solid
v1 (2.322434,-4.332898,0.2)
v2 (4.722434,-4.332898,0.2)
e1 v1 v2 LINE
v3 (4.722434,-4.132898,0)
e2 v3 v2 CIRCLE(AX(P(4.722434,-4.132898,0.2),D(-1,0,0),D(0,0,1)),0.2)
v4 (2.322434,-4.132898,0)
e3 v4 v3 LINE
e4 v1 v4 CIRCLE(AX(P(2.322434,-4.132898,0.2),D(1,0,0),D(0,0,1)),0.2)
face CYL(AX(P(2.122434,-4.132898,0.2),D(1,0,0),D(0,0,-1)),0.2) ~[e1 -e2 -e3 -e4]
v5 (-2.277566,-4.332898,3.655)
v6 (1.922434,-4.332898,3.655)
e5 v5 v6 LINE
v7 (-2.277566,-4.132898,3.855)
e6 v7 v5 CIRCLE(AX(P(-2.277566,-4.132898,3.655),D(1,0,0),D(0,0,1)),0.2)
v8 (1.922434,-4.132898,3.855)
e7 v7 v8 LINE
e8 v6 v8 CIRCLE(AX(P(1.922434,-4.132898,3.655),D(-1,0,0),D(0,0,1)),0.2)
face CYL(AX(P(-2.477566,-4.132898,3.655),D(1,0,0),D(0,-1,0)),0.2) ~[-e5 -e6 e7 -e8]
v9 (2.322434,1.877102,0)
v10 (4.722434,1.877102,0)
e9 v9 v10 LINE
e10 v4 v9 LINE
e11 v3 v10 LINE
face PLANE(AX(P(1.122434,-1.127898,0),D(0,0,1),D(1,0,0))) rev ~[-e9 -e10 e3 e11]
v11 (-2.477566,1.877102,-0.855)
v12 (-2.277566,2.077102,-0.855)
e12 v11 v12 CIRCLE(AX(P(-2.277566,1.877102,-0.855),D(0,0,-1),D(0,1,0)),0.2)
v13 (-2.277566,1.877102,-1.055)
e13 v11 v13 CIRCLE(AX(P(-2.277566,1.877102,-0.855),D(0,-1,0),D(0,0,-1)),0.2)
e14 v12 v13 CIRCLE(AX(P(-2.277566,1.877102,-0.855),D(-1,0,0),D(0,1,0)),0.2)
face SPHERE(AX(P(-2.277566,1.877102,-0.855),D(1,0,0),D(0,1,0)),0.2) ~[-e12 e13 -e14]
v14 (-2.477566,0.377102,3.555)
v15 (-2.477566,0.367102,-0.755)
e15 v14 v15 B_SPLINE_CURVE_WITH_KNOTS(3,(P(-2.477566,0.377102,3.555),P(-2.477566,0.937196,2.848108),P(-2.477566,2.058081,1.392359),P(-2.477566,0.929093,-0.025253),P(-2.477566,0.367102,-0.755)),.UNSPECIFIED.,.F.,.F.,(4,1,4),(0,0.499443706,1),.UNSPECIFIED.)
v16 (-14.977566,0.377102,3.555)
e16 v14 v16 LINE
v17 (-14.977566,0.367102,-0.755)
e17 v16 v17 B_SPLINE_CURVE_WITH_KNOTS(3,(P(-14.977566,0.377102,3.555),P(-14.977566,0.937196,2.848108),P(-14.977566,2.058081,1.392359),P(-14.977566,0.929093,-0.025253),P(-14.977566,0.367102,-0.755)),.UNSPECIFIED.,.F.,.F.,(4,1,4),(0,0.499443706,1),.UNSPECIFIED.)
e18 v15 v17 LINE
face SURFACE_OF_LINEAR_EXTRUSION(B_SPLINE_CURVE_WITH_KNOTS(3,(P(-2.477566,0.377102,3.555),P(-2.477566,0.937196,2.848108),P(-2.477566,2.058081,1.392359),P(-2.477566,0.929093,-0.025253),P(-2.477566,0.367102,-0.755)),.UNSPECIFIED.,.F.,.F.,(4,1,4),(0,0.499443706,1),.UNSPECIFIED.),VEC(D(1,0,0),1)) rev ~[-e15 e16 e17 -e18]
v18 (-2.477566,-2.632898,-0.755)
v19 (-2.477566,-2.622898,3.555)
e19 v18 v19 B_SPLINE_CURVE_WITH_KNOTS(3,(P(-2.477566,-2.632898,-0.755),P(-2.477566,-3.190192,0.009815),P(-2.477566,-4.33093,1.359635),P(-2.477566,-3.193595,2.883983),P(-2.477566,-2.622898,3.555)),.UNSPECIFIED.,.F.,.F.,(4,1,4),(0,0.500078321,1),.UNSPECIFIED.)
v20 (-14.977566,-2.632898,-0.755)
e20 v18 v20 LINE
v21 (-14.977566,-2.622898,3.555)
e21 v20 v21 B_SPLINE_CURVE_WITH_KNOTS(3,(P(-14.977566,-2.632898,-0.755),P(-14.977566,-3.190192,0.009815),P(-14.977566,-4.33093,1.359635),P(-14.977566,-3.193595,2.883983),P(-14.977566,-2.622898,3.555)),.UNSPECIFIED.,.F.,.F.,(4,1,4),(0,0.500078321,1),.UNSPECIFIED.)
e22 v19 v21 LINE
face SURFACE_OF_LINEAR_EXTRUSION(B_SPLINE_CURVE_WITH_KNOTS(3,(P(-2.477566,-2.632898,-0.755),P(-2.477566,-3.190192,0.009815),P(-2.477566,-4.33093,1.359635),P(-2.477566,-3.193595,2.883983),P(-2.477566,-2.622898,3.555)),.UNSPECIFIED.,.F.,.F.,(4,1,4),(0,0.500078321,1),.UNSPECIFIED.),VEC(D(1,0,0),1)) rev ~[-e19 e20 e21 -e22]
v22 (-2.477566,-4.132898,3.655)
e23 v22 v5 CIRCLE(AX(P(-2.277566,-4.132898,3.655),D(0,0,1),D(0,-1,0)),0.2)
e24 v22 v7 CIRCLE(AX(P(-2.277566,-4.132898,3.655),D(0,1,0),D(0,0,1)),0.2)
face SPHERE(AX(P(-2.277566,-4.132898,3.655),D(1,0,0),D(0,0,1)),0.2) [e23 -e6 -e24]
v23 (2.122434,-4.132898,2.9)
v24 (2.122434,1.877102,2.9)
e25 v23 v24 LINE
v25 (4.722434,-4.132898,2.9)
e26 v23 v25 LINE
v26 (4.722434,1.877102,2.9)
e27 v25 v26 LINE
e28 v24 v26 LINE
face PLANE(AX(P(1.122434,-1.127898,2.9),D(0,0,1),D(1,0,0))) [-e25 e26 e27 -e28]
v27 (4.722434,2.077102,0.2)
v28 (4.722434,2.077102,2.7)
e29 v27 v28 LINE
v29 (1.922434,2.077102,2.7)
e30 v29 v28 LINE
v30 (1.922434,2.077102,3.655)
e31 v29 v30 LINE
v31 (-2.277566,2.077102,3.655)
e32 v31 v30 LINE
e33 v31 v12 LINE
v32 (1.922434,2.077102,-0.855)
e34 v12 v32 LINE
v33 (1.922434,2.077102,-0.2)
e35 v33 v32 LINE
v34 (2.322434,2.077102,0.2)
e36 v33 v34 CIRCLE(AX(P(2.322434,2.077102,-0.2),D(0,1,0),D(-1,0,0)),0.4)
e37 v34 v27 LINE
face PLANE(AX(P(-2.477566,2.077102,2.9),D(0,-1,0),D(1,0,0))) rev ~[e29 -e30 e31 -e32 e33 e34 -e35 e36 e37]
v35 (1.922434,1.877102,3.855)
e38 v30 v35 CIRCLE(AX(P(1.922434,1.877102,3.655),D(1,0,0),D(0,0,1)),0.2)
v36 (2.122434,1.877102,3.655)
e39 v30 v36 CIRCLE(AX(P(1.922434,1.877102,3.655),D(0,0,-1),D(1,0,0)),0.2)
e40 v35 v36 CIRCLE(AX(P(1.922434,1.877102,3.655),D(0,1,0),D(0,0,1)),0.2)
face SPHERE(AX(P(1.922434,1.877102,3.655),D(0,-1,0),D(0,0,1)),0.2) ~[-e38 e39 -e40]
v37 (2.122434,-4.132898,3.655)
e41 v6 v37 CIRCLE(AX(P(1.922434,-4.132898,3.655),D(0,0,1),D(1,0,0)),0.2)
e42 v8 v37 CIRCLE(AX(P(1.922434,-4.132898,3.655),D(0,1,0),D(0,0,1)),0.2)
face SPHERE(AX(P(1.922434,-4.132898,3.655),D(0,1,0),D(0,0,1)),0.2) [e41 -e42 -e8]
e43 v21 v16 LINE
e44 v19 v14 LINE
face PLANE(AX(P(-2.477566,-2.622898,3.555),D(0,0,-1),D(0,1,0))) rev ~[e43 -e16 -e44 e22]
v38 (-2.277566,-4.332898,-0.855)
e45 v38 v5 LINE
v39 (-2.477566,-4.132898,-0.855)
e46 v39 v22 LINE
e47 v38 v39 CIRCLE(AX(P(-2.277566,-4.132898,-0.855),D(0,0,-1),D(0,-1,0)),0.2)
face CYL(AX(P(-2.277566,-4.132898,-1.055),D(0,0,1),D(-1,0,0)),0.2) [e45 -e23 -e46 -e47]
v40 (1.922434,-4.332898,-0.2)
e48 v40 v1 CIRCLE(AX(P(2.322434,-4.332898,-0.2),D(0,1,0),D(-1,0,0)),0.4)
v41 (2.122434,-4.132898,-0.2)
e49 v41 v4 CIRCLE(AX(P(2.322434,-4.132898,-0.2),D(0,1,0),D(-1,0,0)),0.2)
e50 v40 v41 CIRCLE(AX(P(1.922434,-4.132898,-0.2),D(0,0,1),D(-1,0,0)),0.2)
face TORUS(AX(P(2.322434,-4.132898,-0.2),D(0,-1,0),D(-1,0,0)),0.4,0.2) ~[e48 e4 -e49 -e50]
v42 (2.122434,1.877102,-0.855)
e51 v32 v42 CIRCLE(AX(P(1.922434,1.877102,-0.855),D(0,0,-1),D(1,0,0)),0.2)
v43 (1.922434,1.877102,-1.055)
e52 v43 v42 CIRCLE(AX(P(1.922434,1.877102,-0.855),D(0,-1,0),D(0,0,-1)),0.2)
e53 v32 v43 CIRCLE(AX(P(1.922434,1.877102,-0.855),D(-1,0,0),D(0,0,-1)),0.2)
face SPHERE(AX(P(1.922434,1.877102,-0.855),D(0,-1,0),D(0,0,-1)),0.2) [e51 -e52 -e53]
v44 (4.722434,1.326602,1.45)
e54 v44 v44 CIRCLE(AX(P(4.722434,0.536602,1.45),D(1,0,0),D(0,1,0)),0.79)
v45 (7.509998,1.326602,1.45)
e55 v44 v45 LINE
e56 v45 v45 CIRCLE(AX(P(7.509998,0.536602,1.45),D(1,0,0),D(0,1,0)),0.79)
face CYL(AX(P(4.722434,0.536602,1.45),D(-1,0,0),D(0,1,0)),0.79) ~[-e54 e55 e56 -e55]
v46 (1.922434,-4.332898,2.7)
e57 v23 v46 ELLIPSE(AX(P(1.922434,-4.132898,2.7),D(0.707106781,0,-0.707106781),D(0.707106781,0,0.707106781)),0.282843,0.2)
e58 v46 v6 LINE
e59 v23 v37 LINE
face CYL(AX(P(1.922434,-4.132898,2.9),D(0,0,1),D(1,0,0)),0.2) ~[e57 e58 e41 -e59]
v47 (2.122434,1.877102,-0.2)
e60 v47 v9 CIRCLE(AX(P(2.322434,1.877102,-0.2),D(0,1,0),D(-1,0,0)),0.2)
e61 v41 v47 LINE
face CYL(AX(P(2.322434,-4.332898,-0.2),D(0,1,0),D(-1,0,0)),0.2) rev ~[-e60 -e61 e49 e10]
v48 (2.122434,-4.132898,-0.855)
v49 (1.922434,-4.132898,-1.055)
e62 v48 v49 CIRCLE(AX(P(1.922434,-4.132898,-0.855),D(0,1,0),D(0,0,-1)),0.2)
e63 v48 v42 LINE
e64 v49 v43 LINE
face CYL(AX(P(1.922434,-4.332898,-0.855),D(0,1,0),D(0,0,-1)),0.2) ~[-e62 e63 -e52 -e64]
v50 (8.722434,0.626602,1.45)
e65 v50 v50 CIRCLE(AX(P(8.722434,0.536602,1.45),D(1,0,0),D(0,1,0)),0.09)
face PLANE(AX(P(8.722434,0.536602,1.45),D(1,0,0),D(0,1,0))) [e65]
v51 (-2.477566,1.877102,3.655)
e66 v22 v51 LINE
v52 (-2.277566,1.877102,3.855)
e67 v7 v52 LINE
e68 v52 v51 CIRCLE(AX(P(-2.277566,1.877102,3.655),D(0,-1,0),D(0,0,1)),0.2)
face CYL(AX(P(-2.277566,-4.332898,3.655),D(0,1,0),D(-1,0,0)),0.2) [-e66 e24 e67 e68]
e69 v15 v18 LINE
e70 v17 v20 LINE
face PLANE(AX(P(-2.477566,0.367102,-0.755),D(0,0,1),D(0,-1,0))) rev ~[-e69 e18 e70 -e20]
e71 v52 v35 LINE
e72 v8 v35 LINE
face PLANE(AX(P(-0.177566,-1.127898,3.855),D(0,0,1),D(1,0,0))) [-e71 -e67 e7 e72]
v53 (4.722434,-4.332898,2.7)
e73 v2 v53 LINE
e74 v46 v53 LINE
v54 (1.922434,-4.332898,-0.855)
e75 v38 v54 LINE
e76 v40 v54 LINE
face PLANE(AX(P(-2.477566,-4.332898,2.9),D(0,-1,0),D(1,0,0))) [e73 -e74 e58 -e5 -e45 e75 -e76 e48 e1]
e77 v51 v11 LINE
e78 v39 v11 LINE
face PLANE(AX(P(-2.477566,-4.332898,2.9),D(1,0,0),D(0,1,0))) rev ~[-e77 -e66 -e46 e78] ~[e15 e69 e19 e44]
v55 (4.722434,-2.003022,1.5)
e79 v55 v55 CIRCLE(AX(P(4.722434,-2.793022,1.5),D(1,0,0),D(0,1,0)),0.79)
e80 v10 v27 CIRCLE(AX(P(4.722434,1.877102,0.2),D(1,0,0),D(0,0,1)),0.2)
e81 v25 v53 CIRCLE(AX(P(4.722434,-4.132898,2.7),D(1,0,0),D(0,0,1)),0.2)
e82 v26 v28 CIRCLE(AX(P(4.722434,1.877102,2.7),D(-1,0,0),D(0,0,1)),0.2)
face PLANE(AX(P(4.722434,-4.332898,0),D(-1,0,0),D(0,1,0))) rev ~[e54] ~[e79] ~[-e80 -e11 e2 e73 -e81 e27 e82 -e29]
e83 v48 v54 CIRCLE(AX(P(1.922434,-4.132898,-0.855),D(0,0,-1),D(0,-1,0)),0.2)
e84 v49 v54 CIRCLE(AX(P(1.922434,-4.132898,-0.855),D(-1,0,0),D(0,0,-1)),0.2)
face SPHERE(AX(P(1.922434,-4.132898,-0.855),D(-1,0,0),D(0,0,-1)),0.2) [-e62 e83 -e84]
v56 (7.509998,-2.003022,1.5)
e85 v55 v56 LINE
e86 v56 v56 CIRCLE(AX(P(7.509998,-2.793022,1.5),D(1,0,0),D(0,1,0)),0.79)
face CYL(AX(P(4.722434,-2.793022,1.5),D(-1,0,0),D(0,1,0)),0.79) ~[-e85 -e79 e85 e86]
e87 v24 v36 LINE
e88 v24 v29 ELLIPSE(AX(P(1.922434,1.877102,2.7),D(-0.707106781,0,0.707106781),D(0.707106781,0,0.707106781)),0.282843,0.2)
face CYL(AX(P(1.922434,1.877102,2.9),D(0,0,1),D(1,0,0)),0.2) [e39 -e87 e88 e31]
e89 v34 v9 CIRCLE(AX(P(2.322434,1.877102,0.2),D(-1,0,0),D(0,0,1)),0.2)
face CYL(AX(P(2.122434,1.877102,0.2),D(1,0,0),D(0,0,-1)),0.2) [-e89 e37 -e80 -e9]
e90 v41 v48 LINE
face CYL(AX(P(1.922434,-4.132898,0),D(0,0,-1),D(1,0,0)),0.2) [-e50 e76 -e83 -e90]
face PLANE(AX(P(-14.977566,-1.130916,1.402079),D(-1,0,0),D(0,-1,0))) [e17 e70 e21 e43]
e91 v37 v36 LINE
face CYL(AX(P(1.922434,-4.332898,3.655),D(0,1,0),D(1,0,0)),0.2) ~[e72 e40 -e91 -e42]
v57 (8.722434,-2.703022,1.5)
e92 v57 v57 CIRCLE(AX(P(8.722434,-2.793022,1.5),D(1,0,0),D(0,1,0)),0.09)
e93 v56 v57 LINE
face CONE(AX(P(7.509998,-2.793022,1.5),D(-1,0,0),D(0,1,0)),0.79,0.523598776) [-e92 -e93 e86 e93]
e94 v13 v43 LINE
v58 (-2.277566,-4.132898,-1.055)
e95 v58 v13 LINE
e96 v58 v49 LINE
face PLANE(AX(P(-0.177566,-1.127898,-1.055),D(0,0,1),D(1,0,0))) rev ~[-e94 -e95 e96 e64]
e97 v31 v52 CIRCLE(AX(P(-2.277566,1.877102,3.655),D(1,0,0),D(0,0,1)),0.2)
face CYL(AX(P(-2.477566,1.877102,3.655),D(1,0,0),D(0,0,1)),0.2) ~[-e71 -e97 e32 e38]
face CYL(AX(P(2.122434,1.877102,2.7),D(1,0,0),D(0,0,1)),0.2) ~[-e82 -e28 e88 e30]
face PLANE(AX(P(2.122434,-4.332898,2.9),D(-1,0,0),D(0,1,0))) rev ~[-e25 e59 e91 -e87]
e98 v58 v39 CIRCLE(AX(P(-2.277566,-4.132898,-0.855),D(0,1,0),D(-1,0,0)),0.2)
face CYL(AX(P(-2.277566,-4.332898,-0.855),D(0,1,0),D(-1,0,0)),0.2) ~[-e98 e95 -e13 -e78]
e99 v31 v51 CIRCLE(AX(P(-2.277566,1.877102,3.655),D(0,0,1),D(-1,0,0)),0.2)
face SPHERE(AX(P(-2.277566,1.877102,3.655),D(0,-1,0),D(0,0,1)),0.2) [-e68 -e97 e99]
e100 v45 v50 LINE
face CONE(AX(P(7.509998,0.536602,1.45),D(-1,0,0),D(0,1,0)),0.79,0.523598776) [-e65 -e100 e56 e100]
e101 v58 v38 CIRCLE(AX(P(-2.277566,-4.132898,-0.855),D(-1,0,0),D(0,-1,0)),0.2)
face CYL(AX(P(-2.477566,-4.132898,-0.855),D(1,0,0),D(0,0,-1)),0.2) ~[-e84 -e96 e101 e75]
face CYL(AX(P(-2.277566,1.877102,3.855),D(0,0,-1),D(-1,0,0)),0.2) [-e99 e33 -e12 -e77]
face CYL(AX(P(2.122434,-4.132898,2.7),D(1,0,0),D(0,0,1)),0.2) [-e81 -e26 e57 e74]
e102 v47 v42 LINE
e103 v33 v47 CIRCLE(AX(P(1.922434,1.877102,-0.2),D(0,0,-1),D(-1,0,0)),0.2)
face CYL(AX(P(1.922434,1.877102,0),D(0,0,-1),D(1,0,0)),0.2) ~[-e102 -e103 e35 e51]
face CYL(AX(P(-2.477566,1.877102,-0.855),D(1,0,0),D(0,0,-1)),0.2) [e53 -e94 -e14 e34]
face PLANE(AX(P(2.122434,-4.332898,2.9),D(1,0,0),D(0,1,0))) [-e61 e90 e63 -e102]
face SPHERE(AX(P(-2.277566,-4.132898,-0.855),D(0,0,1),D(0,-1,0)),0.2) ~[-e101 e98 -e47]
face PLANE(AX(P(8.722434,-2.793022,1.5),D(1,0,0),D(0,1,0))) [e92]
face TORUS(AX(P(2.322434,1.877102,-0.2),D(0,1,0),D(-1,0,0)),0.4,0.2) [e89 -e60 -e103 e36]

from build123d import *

# Parameters (mm, degrees)
F1_W       = 7.2
F1_H       = 6.41
F2_DEPTH   = 2.9
F3_W       = 4.6
F3_H       = 6.41
F4_DEPTH   = 0.955
F5_DEPTH   = 3.955
F6_R       = 0.2
F7_R       = 0.79
F8_DEPTH   = 4
F9_SIZE2   = 0.7
F9_SIZE    = 1.2124355653
F9_2_SIZE2 = 0.7
F9_2_SIZE  = 1.2124355653
F11_DEPTH  = 12.5


# Not quite as in the source:
# - a feature names something its author has since deleted; it is built from what else it names


with BuildPart() as f2:
    # F1 (on face) → F2 (new body)
    with BuildSketch(Plane.XY):
        with Locations((1.1224337457, -1.1278976017)):
            Rectangle(F1_W, F1_H)
    extrude(amount=F2_DEPTH)

    # F3 (on face) → F4 (join)
    with BuildSketch(Plane.XY.offset(2.9)):
        with Locations((-0.1775662543, -1.1278976017)):
            Rectangle(F3_W, F3_H)
    extrude(amount=F4_DEPTH)

    # F3 (on face) → F5 (join)
    with BuildSketch(Plane.XY.offset(2.9)):
        with Locations((-0.1775662543, -1.1278976017)):
            Rectangle(F3_W, F3_H)
    extrude(amount=-F5_DEPTH)

    # F6
    f6_edges = [f2.edges().sort_by_distance(p)[0] for p in [
        (2.122434, -1.127898, 3.855),
        (-0.177566, -4.332898, 3.855),
        (-2.477566, -1.127898, 3.855),
        (-0.177566, 2.077102, 3.855),
        (3.422434, -4.332898, 2.9),
        (2.122434, -4.332898, 3.3775),
        (-2.477566, -4.332898, 1.4),
        (-0.177566, -4.332898, -1.055),
        (2.122434, -1.127898, -1.055),
        (-0.177566, 2.077102, -1.055),
        (2.122434, -4.332898, -0.5275),
        (3.422434, -4.332898, 0),
        (2.122434, 2.077102, -0.5275),
        (3.422434, 2.077102, 2.9),
        (2.122434, 2.077102, 3.3775),
        (3.422434, 2.077102, 0),
        (-2.477566, 2.077102, 1.4),
        (-2.477566, -1.127898, -1.055),
        (2.122434, -1.127898, 0),
    ]]
    fillet(f6_edges, radius=F6_R)

    # F7 (on face) → F8 (join)
    with BuildSketch(Plane.YZ.offset(4.7224337457)):
        with Locations((-2.7930222052, 1.5)):
            Circle(F7_R)
        with Locations((0.5366023983, 1.45)):
            Circle(F7_R)
    extrude(amount=F8_DEPTH)

    # F9
    f9_edges = [f2.edges().sort_by_distance(p)[0] for p in [
        (8.722434, -3.583022, 1.5),
    ]]
    f9_side = f2.faces().sort_by_distance((6.722434, -3.583022, 1.5))[0]
    chamfer(f9_edges, length=F9_SIZE, length2=F9_SIZE2, reference=f9_side)

    # F9#2
    f9_2_edges = [f2.edges().sort_by_distance(p)[0] for p in [
        (8.722434, -0.253398, 1.45),
    ]]
    f9_2_side = f2.faces().sort_by_distance((6.722434, -0.253398, 1.45))[0]
    chamfer(f9_2_edges, length=F9_2_SIZE, length2=F9_2_SIZE2, reference=f9_2_side)

    # F10 (on face) → F11 (join)
    with BuildSketch(Plane(origin=(-2.4775662543, 0, 0), x_dir=(0, -1, 0), z_dir=(-1, 0, 0))):
        with BuildLine():
            Line((2.6228976017, 3.555), (-0.3771023983, 3.555))
            add(Edge.make_bspline(
                [(-0.3771023983, 3.555), (-0.9371962785, 2.8481079618), (-2.0580811679, 1.3923591855), (-0.9290927555, -0.0252525917), (-0.3671023983, -0.755)],
                knots=[0, 0, 0, 0, 0.4994437063, 1, 1, 1, 1], degree=3))
            Line((-0.3671023983, -0.755), (2.6328976017, -0.755))
            add(Edge.make_bspline(
                [(2.6328976017, -0.755), (3.1901916784, 0.0098145578), (4.3309296415, 1.3596346202), (3.1935954585, 2.8839832867), (2.6228976017, 3.555)],
                knots=[0, 0, 0, 0, 0.5000783208, 1, 1, 1, 1], degree=3))
        make_face()
    extrude(amount=F11_DEPTH)


solid = f2.part
